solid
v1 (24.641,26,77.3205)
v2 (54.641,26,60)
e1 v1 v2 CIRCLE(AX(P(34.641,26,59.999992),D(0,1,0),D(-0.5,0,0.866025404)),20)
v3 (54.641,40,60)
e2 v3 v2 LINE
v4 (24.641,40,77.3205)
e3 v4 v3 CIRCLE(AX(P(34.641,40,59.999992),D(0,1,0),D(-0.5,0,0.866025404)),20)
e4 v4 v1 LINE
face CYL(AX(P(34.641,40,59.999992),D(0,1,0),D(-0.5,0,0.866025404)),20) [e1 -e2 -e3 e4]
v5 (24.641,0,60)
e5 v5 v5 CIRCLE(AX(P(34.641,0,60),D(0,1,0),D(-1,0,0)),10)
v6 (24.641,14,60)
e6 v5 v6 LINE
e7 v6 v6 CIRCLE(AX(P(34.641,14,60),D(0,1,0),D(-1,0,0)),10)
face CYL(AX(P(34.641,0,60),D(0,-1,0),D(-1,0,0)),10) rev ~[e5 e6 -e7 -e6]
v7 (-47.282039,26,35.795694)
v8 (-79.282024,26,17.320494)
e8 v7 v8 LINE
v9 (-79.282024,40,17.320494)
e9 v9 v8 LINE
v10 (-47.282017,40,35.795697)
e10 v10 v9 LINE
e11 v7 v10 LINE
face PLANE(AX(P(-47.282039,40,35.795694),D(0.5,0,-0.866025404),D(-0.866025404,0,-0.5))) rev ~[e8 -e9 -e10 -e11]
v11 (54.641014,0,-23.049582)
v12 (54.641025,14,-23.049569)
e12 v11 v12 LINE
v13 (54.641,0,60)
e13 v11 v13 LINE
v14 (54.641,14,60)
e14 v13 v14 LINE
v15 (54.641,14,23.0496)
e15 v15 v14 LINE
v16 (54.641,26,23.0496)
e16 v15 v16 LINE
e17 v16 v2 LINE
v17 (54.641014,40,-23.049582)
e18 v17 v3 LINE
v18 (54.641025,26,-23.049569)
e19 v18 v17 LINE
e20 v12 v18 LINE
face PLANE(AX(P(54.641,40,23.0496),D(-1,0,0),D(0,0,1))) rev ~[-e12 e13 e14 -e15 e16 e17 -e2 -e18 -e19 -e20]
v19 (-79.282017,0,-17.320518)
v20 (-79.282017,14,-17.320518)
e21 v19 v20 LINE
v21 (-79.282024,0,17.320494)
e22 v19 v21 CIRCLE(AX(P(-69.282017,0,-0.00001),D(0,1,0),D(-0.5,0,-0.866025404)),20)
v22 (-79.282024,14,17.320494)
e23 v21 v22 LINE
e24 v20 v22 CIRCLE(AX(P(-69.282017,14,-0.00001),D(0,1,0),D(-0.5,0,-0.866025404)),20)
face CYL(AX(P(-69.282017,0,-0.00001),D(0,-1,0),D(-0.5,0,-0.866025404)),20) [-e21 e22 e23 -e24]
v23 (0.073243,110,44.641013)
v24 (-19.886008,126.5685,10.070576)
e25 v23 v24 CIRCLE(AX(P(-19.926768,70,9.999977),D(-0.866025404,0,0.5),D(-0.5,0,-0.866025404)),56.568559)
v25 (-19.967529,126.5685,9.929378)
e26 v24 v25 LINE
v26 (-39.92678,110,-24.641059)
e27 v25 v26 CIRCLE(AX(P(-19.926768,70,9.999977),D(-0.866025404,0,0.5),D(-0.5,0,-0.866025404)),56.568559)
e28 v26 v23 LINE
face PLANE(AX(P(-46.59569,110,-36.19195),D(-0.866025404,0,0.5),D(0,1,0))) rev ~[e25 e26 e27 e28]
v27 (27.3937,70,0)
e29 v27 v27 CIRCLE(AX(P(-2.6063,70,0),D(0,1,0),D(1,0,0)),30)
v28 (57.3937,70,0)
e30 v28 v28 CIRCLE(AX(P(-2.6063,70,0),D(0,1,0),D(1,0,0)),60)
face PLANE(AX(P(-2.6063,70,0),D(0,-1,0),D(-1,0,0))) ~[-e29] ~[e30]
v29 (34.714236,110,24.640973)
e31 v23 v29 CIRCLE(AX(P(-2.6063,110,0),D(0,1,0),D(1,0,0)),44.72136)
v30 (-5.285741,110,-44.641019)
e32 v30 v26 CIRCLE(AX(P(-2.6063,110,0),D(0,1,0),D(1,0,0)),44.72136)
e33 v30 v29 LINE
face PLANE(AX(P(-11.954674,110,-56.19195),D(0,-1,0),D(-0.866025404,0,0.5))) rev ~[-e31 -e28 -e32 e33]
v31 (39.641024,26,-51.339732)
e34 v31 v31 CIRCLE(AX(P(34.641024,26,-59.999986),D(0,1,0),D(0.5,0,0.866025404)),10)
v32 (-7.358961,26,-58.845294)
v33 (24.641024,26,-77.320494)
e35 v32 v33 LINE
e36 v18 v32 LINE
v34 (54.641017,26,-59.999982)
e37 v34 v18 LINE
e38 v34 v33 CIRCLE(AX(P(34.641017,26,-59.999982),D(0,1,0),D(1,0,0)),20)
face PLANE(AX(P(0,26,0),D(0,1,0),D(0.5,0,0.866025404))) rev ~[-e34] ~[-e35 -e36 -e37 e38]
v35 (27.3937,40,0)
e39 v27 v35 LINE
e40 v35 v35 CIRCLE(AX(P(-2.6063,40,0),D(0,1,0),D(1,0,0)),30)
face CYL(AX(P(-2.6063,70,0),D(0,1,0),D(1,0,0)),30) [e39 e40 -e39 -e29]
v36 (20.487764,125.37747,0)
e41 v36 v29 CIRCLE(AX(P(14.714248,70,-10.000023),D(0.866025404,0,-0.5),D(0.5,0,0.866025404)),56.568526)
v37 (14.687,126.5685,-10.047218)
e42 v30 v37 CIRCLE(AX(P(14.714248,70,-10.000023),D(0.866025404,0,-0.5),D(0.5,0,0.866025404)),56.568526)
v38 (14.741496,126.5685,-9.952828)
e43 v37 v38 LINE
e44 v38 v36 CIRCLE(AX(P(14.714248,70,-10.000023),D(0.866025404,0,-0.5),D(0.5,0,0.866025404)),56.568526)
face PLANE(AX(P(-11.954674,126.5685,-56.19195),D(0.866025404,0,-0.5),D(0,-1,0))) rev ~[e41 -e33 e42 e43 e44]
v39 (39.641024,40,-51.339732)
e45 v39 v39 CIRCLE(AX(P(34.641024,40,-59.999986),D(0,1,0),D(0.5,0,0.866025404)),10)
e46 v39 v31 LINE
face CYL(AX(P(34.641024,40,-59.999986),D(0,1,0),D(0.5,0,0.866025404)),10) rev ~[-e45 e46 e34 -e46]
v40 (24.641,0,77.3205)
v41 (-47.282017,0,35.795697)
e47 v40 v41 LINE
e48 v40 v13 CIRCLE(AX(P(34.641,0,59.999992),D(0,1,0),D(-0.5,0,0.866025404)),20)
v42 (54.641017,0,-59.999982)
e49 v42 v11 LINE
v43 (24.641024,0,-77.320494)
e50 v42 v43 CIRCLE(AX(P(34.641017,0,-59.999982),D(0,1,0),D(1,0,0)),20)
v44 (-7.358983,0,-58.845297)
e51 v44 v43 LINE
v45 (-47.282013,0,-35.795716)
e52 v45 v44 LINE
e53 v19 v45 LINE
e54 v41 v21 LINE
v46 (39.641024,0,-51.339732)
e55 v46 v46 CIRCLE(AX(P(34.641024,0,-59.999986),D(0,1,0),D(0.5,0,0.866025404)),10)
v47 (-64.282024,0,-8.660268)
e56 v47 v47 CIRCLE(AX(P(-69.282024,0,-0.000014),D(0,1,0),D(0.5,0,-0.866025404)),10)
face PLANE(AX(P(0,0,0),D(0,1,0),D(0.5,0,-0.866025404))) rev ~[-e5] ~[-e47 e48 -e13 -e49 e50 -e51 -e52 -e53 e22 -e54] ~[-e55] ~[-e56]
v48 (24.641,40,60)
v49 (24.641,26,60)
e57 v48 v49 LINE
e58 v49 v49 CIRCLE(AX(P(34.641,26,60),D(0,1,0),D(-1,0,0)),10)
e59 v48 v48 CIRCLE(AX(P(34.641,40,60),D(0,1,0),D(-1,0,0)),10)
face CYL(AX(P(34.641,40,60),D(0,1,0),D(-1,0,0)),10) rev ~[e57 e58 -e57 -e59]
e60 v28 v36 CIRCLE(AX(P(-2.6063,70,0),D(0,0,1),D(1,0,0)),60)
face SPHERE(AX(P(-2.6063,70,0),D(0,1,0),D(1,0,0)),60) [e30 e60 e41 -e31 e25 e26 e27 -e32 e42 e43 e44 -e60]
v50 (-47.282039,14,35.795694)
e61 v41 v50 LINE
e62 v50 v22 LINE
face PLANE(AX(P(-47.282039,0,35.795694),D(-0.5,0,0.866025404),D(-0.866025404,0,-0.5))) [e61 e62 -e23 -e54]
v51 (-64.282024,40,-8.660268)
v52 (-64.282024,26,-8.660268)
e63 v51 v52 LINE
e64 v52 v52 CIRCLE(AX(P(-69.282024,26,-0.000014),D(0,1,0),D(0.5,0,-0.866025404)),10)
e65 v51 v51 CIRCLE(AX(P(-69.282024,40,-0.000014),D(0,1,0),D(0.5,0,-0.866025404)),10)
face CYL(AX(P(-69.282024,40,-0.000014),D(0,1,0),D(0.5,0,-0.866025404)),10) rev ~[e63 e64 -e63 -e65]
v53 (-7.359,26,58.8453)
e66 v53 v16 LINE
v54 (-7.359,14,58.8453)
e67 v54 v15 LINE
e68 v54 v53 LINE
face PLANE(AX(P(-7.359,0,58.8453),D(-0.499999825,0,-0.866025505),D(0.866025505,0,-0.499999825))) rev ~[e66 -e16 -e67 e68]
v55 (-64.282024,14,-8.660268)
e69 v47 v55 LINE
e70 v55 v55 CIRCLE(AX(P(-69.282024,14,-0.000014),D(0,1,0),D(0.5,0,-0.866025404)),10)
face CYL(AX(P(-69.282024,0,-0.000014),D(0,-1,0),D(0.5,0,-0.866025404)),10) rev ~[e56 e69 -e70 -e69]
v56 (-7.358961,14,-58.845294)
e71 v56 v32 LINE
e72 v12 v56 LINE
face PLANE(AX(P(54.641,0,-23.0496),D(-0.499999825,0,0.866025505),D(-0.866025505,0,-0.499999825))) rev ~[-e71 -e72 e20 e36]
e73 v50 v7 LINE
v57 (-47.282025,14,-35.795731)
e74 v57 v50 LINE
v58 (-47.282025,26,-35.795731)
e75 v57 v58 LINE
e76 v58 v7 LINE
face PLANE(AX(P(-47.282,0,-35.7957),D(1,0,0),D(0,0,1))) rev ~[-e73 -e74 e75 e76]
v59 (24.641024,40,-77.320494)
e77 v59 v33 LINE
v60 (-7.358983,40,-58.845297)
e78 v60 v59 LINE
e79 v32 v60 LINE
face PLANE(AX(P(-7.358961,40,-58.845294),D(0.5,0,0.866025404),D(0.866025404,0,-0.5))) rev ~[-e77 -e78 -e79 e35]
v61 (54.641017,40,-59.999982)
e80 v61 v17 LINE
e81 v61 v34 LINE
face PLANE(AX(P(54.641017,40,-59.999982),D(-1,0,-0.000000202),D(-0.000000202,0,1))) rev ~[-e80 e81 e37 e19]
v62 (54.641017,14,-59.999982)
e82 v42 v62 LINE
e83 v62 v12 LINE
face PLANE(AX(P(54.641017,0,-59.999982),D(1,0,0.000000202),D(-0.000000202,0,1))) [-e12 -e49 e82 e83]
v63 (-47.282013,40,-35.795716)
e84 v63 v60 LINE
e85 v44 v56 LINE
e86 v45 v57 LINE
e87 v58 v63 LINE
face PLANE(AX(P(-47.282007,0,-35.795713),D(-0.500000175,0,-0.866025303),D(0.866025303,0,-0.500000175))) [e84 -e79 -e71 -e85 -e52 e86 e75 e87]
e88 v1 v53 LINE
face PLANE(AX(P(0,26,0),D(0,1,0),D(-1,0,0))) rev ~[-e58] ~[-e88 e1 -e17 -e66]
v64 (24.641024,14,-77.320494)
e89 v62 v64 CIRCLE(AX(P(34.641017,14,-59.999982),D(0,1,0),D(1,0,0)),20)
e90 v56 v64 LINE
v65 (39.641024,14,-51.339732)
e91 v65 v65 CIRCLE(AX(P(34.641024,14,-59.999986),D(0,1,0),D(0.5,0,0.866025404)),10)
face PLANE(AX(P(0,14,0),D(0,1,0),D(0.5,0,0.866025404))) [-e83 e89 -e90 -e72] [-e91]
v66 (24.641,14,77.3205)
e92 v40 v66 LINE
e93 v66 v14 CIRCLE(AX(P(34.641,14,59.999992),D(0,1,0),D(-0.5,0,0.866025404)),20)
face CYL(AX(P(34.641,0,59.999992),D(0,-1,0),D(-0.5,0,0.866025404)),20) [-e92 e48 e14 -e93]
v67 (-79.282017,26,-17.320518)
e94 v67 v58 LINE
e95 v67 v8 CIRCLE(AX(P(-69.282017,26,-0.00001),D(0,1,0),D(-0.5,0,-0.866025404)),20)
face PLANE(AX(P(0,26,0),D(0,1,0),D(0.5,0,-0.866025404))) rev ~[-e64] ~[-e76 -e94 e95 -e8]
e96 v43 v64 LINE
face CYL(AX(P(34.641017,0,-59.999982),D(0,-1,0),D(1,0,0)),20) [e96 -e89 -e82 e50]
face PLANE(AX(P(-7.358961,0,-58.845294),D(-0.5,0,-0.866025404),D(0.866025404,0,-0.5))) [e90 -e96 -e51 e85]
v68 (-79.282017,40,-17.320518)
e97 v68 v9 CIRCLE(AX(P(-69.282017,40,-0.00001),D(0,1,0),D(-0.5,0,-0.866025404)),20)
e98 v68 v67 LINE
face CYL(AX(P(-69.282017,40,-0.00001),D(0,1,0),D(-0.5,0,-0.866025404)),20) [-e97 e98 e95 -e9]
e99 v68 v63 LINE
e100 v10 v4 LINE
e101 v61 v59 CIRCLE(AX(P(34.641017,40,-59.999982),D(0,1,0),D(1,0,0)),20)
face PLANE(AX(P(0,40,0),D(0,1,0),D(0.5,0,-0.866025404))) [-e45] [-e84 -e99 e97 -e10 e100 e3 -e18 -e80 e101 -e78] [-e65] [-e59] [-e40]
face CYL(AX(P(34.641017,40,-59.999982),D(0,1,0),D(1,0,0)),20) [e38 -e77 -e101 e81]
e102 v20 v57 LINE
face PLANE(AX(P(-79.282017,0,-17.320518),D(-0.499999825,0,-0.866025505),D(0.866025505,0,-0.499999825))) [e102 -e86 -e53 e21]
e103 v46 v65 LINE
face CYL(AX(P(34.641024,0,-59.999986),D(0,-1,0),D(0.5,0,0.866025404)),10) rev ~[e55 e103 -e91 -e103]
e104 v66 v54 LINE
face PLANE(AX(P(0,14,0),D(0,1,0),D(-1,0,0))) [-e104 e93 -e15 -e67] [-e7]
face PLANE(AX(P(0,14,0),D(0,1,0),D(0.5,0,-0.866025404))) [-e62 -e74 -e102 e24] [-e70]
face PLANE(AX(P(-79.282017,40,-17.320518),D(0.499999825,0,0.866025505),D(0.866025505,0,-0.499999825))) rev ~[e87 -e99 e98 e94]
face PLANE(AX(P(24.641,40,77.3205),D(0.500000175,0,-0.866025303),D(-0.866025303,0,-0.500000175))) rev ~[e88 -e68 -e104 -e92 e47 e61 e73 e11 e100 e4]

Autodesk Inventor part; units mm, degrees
ref_plane "YZ Plane" through (0, 0, 0) normal (1, 0, 0) x (0, 1, 0)
ref_plane "XZ Plane" through (0, 0, 0) normal (0, 1, 0) x (-1, 0, 0)
sketch "Sketch1" plane through (0, 0, 0) normal (0, 1, 0) x (-1, 0, 0)
  line L0 (79.282, -17.3205) -> (-24.641, -77.3205)
  line L1 (-54.641, -60) -> (-54.641, 60)
  line L2 (-24.641, 77.3205) -> (79.282, 17.3205)
  arc A0 (79.282, -17.3205) -> (79.282, 17.3205) centre (69.282, 0) ccw
  arc A1 (-54.641, -60) -> (-24.641, -77.3205) centre (-34.641, -60) ccw
  arc A2 (-24.641, 77.3205) -> (-54.641, 60) centre (-34.641, 60) ccw
  line L3 (47.282, -35.7957) -> (47.282, 35.7957)
  line L4 (7.359, 58.8453) -> (-54.641, 23.0496)
  line L5 (-54.641, -23.0496) -> (7.359, -58.8453)
  circle A3 centre (69.282, 0) radius 10
  circle A4 centre (-34.641, -60) radius 10
  circle A5 centre (-34.641, 60) radius 10
  point P0 (0, 0)
  point P1 (109.282, 0)
  point P2 (-54.641, -94.641)
  point P3 (-54.641, 94.641)
  point P4 (0, 0)
  dimension "d18" = 20
  dimension "d19" = 120
  dimension "d22" = 22
  dimension "d25" = 360
  dimension "d27" = 20
extrude "Extrusion1" add sketch "Sketch1" along normal blind 40 contours L0 L5 L1 L4 L2 L3
extrude "Extrusion2" add sketch "Sketch1" along normal blind 14 contours L4 L1 A2 L2
extrude "Extrusion3" add sketch "Sketch1" against normal blind 14 from surface at 40 contours L4 L1 A2 L2
pattern_circular "Circular Pattern1" count 3 over 360 about axis through (0, -10, 0) along (0, 1, 0) of "Extrusion3", "Extrusion2"
ref_plane "Work Plane1" through (0, 70, 0) normal (0, 1, 0) x (1, 0, 0)
sketch "Sketch2" plane through (0, 70, 0) normal (0, 1, 0) x (1, 0, 0)
  line L0 (54.641, 60) -> (54.641, -60) projected
  line L1 (-79.282, 17.3205) -> (24.641, 77.3205) projected
  line L2 (24.641, -77.3205) -> (-79.282, -17.3205) projected
  circle A0 centre (-2.6063, 0) radius 57.2473
  circle A1 centre (-2.6063, 0) radius 30
  point P0 (0, 0)
  point P1 (-7.359, 58.8453)
  point P2 (-47.282, 35.7957)
  point P3 (-47.282, -35.7957)
  point P4 (-7.359, -58.8453)
  dimension "d38" = 60
extrude "Extrusion4" add sketch "Sketch2" against normal up to surface (30 mm away) contours A1
sketch "Sketch3" plane through (0, 0, 0) normal (0, 0, 1) x (1, 0, 0)
  line L0 (27.3937, 70) -> (-32.6063, 70) projected
  line L1 (57.3937, 70) -> (-2.6063, 70)
  line L2 (-2.6063, 70) -> (-2.6063, 130)
  arc A0 (57.3937, 70) -> (-2.6063, 130) centre (-2.6063, 70) ccw
  line L3 (-32.6063, 40) -> (27.3937, 40) projected
  point P0 (0, 0)
  point P1 (-2.6063, 70)
  dimension "d41" = 60
revolve "Revolution1" add sketch "Sketch3" angle 360 about axis through (-2.6063, 70, 0) along (0, 1, 0)
sketch "Sketch4" plane through (-79.282, 0, -17.3205) normal (-0.5, 0, -0.8660254) x (-0.8660254, 0, 0.5)
  arc A0 (2.2571, 70) -> (-117.7429, 70) centre (-57.7429, 70) ccw projected
  line L0 (-77.7429, 126.5685) -> (-77.7429, 110)
  line L1 (-77.7429, 110) -> (-37.7429, 110)
  line L2 (-37.7429, 110) -> (-37.7429, 126.5685)
  line L3 (2.2571, 70) -> (-117.7429, 70) projected
  point P0 (-60, 0)
  dimension "d43" = 40
  dimension "d44" = 40
extrude "Extrusion5" cut sketch "Sketch4" against normal up to surface contours L2 L1 L0 A0
properties part number "b4"
